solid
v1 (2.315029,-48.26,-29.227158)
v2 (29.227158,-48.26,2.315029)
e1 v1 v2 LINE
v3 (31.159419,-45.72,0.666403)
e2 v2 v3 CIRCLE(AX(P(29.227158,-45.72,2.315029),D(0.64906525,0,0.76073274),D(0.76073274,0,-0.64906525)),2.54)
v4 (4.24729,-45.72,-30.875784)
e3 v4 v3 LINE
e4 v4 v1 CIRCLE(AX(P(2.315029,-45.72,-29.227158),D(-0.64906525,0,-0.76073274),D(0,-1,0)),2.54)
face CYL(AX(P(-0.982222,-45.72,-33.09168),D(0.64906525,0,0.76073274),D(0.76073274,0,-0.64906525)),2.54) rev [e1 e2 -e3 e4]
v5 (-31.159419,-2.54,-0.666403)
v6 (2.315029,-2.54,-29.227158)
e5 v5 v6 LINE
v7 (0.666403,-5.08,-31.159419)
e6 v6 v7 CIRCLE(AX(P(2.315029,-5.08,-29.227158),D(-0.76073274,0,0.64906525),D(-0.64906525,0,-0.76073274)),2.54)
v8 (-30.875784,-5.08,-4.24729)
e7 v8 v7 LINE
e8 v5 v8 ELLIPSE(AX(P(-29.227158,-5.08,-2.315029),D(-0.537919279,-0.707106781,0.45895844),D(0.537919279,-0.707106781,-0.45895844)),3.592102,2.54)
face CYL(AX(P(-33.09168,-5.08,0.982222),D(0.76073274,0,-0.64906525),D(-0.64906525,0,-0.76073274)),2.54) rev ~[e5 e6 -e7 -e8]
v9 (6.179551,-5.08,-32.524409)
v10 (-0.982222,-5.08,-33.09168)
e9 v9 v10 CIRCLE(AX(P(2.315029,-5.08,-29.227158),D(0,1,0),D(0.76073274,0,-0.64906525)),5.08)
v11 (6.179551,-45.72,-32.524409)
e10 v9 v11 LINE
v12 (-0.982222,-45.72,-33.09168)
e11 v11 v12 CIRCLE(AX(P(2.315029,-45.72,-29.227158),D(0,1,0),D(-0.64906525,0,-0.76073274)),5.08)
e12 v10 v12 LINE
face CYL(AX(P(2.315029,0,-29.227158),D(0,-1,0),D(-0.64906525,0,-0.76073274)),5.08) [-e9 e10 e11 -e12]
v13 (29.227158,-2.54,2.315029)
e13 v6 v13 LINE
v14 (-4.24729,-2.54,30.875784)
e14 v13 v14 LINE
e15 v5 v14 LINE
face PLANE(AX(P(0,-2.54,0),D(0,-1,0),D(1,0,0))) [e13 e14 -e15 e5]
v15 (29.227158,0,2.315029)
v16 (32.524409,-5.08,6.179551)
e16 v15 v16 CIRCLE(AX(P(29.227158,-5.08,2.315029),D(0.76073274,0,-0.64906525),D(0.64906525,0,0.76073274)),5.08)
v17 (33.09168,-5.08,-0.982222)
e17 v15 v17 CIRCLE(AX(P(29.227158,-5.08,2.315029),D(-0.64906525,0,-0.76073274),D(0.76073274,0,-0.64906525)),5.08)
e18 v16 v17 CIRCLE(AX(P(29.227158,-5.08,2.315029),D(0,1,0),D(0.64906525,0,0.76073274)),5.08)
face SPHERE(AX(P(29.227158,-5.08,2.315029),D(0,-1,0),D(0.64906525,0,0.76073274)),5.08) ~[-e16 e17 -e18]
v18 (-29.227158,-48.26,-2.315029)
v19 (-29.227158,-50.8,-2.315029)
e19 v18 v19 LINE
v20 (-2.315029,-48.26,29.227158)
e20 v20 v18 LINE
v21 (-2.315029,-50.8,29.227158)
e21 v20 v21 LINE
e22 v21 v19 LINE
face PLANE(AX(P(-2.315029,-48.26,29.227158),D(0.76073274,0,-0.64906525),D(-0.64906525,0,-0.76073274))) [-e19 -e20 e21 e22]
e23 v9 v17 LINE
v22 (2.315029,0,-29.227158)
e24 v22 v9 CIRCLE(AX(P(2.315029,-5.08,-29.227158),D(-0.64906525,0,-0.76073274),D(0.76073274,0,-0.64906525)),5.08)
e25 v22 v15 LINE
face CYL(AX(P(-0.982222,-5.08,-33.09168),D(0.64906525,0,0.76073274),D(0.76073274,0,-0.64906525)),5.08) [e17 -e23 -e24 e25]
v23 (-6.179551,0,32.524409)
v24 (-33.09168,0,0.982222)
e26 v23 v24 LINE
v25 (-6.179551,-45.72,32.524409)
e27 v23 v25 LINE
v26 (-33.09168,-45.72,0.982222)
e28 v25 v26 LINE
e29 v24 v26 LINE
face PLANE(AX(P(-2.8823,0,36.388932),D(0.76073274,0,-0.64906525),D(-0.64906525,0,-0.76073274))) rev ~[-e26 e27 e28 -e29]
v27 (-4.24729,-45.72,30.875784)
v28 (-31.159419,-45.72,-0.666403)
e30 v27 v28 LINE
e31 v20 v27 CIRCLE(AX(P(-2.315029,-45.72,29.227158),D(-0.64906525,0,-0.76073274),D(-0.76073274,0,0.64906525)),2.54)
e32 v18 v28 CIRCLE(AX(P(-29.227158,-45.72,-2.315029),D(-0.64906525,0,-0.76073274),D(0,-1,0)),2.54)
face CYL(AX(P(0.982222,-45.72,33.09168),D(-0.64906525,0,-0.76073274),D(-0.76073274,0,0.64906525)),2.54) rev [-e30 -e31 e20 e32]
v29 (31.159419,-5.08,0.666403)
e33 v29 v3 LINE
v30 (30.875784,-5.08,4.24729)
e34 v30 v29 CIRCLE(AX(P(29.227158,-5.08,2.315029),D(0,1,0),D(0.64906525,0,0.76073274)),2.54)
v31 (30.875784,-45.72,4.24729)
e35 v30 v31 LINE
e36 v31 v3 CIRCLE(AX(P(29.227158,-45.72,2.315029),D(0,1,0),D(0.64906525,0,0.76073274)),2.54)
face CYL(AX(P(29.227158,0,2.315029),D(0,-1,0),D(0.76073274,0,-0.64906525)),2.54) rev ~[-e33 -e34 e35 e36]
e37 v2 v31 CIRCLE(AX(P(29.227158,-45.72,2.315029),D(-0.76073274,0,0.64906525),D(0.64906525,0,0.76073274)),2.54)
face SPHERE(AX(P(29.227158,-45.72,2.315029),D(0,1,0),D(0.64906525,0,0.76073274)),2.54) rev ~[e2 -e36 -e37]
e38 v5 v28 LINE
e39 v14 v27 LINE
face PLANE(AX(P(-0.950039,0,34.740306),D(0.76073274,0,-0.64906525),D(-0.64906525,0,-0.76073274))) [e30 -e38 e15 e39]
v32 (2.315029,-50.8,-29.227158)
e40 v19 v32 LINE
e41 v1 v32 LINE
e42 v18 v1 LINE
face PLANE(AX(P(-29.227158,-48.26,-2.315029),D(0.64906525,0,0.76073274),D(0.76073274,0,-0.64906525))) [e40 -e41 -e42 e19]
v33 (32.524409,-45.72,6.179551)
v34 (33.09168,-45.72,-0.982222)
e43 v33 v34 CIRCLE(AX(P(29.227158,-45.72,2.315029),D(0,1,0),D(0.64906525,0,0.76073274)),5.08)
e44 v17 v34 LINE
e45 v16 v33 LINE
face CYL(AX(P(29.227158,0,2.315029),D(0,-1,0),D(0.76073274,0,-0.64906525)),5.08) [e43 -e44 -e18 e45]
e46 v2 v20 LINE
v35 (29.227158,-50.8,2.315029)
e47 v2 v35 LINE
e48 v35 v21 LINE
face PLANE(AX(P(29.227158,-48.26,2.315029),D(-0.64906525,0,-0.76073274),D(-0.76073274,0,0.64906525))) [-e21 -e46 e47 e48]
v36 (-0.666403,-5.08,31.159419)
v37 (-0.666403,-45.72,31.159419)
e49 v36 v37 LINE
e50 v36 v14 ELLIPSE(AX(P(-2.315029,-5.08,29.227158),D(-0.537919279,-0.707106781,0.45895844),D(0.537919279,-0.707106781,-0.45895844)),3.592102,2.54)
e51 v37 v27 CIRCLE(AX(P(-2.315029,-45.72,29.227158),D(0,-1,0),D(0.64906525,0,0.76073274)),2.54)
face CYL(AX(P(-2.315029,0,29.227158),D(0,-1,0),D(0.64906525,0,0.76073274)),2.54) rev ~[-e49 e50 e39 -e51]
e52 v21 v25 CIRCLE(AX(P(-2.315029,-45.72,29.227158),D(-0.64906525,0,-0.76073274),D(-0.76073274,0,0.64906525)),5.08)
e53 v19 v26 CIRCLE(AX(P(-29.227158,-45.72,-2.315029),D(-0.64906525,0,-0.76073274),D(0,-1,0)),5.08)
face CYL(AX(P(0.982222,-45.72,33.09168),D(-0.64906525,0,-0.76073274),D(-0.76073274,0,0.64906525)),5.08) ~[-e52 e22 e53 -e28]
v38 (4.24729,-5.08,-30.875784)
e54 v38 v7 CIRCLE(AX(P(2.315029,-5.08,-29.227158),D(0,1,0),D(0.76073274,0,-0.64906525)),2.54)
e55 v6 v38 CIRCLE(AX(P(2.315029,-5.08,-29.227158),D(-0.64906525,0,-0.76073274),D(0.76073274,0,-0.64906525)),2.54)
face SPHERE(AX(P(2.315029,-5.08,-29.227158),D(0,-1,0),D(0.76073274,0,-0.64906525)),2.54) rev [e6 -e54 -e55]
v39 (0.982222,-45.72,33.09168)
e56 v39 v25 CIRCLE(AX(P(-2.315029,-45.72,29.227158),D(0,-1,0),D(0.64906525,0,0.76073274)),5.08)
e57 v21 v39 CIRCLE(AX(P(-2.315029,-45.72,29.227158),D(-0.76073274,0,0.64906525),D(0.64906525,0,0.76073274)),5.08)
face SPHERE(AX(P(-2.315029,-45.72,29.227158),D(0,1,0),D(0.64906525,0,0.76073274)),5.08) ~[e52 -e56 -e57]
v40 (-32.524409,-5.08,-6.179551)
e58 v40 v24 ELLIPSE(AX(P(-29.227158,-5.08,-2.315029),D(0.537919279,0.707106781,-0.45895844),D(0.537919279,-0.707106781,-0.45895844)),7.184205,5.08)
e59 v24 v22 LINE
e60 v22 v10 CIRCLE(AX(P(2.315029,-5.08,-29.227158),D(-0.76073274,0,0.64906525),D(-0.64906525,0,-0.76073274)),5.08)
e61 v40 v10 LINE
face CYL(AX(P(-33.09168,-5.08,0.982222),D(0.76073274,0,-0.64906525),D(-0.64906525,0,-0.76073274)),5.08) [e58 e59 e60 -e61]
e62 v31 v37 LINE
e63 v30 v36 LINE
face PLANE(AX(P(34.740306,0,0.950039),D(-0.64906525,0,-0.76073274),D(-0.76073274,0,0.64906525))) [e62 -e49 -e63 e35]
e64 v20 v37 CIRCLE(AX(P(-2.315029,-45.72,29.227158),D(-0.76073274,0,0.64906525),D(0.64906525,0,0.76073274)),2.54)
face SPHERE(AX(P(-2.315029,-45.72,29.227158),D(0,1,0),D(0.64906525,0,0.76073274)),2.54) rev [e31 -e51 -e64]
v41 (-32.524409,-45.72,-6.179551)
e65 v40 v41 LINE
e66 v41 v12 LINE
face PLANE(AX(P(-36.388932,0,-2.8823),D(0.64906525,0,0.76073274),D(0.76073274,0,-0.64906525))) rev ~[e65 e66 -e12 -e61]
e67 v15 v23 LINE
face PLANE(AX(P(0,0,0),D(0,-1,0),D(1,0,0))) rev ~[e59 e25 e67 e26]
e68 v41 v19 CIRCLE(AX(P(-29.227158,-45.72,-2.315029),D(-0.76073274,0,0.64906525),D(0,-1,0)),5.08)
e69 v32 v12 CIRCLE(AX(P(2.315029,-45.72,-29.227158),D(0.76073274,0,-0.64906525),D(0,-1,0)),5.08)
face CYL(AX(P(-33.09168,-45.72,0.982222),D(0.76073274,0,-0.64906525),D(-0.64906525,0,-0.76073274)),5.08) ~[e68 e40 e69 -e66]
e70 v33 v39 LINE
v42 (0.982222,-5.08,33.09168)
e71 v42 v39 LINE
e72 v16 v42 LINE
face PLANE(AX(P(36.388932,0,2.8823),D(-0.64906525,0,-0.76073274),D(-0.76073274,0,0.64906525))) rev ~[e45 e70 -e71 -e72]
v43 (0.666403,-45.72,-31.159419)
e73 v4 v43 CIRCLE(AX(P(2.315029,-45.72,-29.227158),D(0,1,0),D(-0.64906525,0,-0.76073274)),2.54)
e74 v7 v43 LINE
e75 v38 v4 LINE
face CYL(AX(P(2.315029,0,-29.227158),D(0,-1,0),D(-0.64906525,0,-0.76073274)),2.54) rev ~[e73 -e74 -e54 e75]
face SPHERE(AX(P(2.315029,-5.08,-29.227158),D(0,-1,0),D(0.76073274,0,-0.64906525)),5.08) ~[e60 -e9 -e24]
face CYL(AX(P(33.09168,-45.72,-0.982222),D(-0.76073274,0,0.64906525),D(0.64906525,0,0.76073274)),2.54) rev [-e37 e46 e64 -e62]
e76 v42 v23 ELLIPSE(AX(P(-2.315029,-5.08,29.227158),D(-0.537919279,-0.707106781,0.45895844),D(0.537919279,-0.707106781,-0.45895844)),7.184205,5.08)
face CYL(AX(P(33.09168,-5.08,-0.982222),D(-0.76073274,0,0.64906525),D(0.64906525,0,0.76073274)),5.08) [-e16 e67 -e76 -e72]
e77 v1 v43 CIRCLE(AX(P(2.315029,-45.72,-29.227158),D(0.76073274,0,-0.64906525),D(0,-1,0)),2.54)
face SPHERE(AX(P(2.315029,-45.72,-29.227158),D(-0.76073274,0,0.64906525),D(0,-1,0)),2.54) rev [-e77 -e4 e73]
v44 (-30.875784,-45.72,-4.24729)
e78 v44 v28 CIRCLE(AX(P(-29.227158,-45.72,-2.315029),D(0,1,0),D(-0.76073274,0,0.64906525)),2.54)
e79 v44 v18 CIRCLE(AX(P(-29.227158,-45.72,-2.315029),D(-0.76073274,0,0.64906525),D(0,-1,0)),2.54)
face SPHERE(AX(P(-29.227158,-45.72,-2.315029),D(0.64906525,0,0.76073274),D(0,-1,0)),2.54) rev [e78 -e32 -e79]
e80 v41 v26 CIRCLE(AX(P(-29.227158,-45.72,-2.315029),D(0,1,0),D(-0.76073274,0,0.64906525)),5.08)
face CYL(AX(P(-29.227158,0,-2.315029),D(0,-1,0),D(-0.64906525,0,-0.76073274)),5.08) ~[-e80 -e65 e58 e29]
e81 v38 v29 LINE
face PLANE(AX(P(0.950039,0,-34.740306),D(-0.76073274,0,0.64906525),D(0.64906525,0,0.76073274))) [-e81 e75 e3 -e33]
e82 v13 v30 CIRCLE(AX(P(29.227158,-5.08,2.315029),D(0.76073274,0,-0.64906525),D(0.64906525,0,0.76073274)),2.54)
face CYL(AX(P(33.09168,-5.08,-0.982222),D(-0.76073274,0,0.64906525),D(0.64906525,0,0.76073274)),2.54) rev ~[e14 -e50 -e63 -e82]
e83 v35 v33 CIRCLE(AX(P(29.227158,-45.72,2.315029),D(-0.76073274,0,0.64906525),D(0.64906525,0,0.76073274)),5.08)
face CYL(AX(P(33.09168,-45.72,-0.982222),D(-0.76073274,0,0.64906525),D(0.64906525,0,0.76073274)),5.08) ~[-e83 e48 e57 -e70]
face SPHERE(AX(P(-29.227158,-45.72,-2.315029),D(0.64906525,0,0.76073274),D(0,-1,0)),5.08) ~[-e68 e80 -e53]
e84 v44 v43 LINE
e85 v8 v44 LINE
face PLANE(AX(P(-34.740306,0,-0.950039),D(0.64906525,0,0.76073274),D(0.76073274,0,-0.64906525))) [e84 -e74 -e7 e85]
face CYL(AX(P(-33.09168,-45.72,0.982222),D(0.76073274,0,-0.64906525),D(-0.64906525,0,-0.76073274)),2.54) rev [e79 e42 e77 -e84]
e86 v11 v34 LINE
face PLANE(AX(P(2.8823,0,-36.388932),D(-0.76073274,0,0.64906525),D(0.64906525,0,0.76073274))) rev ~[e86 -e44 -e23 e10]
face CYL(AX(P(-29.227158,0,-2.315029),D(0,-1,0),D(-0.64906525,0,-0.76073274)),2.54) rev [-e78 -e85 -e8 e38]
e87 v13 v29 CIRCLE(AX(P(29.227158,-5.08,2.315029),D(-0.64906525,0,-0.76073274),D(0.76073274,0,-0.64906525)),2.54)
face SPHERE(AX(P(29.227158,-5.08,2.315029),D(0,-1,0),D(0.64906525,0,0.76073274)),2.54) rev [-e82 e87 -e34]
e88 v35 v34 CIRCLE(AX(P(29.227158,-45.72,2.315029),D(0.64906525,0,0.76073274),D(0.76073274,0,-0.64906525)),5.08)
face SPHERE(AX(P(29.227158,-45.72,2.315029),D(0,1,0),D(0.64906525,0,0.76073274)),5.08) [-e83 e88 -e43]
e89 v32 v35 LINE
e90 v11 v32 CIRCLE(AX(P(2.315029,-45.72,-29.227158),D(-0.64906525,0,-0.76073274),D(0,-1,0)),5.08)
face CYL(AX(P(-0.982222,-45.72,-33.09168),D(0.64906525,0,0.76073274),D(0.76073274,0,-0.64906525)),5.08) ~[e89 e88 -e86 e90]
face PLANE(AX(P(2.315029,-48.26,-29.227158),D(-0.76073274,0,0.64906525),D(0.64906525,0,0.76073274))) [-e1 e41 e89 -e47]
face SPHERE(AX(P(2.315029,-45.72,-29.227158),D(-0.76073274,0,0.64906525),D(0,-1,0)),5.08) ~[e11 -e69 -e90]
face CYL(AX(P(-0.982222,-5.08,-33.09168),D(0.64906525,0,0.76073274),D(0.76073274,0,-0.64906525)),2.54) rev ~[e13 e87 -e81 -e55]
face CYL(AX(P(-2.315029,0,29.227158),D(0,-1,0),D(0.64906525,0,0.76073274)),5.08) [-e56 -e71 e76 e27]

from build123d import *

# Parameters (mm, degrees)
F1_DEPTH = 50.8
F2_R     = 5.08
F3_T     = -2.54


# Not quite as in the source:
# - a shell that OpenCascade refuses in one call is made with other operations: the cavity is built on its own and cut out


with BuildPart() as f1:
    # F0 (on Front) → F1 (new body)
    with BuildSketch(Plane.XZ):
        Polygon((-36.388931796, -2.8822999448), (2.8822999448, -36.388931796), (36.388931796, 2.8822999448), (-2.8822999448, 36.388931796), align=None)
    extrude(amount=F1_DEPTH)

    # F2
    f2_edges = [f1.edges().sort_by_distance(p)[0] for p in [
        (36.388932, -25.4, 2.8823),
        (-2.8823, -25.4, 36.388932),
        (16.753316, 0, 19.635616),
        (16.753316, -50.8, 19.635616),
        (-19.635616, -50.8, 16.753316),
        (-16.753316, -50.8, -19.635616),
        (19.635616, -50.8, -16.753316),
        (2.8823, -25.4, -36.388932),
        (19.635616, 0, -16.753316),
        (-36.388932, -25.4, -2.8823),
        (-16.753316, 0, -19.635616),
    ]]
    fillet(f2_edges, radius=F2_R)

    # F3: a shell. OpenCascade refuses it in one call, so the cavity is built on its own and cut out:
    # the body offset inwards by the wall thickness, plus a prism from it out through each open face.
    f3_core = offset(f1.part, amount=F3_T, mode=Mode.PRIVATE)
    f3_exits = [f3_core.faces().sort_by_distance(p)[0] for p in [
        (0, -48.26, 0),
    ]]
    add(f3_core, mode=Mode.SUBTRACT)
    extrude(f3_exits, amount=-F3_T, mode=Mode.SUBTRACT)


solid = f1.part
